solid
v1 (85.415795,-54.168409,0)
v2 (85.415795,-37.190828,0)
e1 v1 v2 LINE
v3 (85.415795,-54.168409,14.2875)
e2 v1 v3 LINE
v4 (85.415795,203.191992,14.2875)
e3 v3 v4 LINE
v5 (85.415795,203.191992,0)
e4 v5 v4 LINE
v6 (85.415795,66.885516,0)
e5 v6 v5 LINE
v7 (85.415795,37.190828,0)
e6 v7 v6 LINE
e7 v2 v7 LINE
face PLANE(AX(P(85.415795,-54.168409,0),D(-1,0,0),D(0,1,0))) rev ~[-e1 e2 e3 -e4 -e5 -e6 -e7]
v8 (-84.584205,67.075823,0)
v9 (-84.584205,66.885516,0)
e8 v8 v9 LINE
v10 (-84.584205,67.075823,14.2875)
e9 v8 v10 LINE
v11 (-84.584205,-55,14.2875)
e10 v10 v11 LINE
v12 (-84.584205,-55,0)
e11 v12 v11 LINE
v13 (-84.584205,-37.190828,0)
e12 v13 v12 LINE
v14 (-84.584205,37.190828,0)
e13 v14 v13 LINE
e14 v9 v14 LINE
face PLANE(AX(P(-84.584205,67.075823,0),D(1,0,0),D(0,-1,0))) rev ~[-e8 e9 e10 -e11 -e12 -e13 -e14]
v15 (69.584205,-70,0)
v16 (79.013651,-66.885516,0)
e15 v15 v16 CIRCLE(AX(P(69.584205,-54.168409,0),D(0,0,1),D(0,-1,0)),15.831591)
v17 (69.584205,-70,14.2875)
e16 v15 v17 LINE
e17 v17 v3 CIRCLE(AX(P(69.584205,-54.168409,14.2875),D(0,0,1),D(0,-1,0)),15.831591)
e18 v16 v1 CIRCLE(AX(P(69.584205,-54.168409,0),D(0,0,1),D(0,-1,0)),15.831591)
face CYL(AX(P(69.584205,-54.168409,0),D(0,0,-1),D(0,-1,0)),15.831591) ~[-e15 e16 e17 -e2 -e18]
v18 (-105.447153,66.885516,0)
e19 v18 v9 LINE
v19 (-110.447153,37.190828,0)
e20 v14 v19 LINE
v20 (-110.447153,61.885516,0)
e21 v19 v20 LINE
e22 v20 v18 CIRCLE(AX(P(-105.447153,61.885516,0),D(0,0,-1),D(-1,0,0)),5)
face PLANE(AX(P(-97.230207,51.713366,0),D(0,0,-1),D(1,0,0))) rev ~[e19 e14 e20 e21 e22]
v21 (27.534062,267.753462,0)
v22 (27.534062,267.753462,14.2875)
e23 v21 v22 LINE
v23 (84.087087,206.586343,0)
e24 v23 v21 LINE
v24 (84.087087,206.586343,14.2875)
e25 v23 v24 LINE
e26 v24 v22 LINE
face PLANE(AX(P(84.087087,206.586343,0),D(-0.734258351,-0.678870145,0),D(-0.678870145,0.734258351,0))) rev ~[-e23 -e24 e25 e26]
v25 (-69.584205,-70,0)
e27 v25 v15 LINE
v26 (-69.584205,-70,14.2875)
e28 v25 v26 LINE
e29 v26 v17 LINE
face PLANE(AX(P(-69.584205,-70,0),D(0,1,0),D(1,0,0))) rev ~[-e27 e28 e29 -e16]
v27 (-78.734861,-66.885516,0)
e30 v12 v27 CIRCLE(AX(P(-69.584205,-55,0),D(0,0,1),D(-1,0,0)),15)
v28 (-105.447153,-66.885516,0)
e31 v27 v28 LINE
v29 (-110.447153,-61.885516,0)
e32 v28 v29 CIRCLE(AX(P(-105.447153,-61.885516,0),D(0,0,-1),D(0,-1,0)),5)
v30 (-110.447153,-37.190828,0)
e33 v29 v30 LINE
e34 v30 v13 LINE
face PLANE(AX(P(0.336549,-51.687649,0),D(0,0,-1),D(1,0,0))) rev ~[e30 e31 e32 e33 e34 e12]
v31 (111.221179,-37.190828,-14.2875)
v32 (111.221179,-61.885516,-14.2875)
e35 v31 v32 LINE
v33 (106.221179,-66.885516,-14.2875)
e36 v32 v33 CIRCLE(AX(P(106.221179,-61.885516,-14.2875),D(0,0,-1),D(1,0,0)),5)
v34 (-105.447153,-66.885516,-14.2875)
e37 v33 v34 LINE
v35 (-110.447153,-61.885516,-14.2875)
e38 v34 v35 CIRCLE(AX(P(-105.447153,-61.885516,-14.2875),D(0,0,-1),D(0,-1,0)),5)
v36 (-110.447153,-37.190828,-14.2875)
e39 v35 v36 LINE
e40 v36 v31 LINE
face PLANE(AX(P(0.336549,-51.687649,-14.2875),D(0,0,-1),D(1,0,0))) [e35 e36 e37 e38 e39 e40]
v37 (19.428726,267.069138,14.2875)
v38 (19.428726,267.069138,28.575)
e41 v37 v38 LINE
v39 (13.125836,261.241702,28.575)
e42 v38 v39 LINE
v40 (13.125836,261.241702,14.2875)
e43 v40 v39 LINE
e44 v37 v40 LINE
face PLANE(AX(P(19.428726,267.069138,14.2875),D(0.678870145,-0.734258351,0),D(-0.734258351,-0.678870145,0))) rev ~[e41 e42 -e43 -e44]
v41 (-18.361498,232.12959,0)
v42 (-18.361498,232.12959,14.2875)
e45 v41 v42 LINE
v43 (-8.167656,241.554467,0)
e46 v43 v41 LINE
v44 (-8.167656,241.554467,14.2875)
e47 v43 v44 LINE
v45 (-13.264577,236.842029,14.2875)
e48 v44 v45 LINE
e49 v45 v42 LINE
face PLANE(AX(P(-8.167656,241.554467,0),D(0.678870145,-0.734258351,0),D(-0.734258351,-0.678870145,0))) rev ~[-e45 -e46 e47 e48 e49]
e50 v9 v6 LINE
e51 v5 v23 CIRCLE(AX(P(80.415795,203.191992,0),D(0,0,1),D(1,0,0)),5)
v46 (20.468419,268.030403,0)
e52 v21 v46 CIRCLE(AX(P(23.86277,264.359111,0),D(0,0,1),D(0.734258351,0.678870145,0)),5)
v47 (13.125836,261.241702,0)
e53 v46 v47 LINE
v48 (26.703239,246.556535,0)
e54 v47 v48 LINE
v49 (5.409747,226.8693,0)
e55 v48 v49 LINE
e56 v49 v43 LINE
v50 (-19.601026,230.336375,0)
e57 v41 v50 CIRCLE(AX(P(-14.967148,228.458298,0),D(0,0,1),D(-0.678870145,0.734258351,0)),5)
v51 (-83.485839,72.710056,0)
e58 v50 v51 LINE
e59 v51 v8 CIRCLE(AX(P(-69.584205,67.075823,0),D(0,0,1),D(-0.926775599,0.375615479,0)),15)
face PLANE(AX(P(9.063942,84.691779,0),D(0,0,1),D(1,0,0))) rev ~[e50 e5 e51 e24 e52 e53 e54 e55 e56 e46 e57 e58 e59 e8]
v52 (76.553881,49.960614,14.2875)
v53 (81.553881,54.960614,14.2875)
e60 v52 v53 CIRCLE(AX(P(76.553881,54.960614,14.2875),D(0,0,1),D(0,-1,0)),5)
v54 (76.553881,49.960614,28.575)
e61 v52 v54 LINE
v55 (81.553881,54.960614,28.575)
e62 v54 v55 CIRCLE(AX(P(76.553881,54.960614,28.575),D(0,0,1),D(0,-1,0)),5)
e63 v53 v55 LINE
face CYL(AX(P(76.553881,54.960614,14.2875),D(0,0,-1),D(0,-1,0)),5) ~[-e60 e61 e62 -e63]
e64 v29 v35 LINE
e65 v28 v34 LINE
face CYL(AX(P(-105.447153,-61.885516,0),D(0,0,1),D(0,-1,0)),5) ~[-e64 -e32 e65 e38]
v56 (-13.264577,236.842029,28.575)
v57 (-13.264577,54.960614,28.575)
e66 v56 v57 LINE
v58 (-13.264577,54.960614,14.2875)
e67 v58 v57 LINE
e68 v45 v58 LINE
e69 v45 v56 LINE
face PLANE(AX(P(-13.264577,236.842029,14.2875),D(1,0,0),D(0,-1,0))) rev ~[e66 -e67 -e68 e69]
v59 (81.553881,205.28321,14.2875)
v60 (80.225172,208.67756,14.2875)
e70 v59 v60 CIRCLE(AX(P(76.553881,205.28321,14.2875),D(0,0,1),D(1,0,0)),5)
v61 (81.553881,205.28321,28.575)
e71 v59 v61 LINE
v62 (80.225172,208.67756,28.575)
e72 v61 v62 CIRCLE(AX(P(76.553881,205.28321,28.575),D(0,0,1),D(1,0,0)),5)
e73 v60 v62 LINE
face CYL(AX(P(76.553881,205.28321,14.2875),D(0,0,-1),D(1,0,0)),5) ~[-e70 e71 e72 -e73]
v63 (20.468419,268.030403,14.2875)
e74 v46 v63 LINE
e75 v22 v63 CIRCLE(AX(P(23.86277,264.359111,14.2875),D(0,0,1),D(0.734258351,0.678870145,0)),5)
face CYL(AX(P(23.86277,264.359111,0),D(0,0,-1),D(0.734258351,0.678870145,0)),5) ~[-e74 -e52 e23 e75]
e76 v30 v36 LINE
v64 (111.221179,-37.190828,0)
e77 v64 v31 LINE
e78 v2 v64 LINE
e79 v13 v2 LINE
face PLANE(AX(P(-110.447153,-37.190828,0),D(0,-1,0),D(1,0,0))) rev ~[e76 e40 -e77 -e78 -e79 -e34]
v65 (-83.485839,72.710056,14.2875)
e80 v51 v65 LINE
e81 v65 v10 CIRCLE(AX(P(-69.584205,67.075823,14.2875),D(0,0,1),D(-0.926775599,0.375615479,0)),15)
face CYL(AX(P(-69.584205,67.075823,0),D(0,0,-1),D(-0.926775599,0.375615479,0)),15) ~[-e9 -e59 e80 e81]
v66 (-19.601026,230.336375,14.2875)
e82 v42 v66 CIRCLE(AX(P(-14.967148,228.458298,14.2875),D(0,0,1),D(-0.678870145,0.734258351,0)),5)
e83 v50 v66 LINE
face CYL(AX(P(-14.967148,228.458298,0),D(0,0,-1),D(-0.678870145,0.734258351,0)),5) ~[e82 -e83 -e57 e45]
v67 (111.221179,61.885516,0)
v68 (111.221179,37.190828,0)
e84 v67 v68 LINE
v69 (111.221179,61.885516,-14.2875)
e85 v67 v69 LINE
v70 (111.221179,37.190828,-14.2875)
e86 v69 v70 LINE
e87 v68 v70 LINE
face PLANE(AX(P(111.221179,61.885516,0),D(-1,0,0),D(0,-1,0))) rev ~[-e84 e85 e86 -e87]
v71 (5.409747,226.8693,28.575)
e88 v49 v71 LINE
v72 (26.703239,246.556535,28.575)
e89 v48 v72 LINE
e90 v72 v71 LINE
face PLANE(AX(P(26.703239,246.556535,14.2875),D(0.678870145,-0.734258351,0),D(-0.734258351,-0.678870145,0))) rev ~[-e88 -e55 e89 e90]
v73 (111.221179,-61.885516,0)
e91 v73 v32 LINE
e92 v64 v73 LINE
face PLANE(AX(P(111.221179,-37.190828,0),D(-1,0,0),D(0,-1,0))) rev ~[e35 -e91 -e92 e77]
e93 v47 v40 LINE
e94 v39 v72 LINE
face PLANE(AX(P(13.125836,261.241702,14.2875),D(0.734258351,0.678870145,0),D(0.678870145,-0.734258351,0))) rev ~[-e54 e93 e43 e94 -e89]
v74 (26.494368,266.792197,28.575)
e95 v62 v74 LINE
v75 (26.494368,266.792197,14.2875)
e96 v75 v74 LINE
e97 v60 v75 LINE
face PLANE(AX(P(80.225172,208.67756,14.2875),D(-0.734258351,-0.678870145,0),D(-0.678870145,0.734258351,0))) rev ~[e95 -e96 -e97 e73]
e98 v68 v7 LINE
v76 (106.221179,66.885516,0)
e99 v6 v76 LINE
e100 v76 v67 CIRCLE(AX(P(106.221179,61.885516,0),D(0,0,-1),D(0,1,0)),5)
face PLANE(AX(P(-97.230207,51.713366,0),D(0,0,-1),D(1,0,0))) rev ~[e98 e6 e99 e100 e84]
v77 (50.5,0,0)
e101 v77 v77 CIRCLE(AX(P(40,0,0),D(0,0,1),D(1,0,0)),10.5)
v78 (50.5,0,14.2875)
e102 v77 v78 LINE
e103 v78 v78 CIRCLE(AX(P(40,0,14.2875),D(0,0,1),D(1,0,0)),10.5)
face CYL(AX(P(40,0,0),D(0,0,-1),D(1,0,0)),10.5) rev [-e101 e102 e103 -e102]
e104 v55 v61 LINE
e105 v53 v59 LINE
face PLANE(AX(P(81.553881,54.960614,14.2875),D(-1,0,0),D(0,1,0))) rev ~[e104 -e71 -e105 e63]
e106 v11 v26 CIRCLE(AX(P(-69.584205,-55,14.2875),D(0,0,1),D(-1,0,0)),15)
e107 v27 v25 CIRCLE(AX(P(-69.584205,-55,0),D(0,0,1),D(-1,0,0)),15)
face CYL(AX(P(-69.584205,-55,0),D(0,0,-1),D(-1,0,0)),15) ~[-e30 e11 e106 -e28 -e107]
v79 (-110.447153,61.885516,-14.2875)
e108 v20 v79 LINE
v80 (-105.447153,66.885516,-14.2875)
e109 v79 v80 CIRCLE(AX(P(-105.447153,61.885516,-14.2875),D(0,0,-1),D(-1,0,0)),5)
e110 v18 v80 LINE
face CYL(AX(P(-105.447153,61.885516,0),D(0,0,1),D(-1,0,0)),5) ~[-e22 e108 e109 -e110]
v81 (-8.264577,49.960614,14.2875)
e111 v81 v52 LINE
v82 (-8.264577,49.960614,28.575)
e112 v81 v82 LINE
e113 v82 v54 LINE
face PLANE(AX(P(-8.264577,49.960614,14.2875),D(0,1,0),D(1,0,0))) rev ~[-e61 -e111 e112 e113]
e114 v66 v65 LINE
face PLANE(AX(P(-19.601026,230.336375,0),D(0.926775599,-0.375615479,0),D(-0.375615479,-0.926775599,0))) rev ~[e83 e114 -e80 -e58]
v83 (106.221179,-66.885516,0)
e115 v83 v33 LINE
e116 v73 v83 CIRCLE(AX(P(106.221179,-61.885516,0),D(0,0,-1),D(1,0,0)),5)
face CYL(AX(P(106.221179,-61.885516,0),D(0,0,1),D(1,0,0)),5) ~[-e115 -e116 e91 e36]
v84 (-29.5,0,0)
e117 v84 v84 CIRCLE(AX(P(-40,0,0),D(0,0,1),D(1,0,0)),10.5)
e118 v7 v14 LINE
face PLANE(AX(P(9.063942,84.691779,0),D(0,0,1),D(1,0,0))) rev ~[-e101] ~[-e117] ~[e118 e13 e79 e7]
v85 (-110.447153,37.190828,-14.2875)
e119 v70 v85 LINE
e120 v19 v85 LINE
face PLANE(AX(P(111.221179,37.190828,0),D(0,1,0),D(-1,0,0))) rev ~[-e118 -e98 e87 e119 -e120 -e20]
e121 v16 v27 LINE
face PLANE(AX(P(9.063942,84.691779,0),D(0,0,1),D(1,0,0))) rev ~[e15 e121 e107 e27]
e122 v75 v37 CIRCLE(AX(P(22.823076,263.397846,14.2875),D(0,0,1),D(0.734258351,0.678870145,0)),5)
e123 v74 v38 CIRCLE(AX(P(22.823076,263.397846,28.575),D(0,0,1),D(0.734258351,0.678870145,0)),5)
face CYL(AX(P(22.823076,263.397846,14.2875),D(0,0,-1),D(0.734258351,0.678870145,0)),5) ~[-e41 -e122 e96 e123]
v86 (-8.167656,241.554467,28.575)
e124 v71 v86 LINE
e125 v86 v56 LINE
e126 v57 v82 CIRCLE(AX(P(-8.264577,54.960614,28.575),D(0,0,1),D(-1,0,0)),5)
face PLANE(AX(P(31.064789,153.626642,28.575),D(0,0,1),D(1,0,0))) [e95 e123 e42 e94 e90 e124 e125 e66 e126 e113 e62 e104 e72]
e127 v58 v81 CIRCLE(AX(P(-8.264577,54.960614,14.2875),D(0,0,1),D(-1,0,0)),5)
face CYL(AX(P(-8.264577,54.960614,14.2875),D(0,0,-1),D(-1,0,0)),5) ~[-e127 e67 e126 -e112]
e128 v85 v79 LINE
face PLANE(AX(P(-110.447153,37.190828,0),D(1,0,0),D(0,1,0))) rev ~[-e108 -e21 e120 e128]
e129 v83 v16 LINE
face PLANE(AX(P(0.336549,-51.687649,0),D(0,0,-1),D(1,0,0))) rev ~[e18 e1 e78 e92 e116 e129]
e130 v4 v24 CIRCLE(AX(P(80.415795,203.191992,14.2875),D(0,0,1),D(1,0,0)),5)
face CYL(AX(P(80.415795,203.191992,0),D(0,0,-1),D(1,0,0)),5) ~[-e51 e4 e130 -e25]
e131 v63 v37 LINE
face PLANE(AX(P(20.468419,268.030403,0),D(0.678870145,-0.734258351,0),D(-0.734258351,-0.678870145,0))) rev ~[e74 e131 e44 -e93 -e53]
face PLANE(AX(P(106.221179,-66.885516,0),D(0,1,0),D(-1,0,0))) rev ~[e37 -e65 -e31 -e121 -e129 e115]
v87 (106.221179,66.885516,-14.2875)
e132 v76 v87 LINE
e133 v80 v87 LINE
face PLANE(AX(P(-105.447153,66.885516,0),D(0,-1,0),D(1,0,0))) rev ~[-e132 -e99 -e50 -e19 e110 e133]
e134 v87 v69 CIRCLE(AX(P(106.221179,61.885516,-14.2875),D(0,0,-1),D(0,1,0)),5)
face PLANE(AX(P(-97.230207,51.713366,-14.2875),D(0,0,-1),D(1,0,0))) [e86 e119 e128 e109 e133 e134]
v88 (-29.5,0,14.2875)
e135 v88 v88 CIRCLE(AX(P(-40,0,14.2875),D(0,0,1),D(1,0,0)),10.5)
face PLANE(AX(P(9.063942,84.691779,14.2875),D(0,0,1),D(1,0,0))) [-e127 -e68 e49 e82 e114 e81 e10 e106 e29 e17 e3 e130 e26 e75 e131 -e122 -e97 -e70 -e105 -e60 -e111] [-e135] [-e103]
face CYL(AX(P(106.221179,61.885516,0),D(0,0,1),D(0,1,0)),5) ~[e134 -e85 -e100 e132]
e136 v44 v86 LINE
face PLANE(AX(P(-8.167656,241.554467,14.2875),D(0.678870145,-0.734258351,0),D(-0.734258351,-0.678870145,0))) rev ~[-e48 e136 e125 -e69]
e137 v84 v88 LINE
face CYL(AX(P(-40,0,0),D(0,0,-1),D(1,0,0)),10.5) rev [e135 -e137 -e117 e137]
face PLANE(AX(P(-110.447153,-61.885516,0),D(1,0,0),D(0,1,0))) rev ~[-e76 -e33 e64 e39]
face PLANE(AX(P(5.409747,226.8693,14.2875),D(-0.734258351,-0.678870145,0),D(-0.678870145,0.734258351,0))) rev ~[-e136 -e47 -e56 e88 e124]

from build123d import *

# Parameters (mm, degrees)
F0_R     = 10.5
F1_DEPTH = 14.2875
F2_W     = 170
F2_H     = 29.6946875751
F3_DEPTH = 14.2875
F5_DEPTH = 14.2875


# Not quite as in the source:
# - a length typed as a fraction of an inch, garbled in the dataset ("3 / 203.2 mm" for 3/8 in), is restored
# - a feature names something its author has since deleted; it is built from what else it names


with BuildPart() as f1:
    # F0 (on Top) → F1 (new body)
    with BuildSketch(Plane.XY):
        with BuildLine():
            ThreePointArc((-84.5842045546, -55), (-80.1908062724, -65.6066017178), (-69.5842045546, -70))
            Line((-69.5842045546, -70), (69.5842045546, -70))
            ThreePointArc((69.5842045546, -70), (80.7788298305, -65.363034385), (85.4157954454, -54.1684091091))
            Line((85.4157954454, -54.1684091091), (85.4157954454, 203.1919921827))
            ThreePointArc((85.4157954454, 203.1919921827), (85.0717839963, 205.0145647093), (84.0870871996, 206.5863429094))
            Line((84.0870871996, 206.5863429094), (27.5340619023, 267.7534620916))
            ThreePointArc((27.5340619023, 267.7534620916), (24.0585970267, 269.3552750765), (20.4684194215, 268.030403119))
            Line((20.4684194215, 268.030403119), (13.1258359132, 261.2417016656))
            Line((13.1258359132, 261.2417016656), (26.70323882, 246.556534649))
            Line((26.70323882, 246.556534649), (16.0564927329, 236.7129175415))
            Line((16.0564927329, 236.7129175415), (5.4097466459, 226.8693004341))
            Line((5.4097466459, 226.8693004341), (-8.1676562609, 241.5544674507))
            Line((-8.1676562609, 241.5544674507), (-18.3614984488, 232.1295897903))
            ThreePointArc((-18.3614984488, 232.1295897903), (-19.0801780579, 231.3013565049), (-19.6010257192, 230.336375433))
            Line((-19.6010257192, 230.336375433), (-83.4858385457, 72.7100555545))
            ThreePointArc((-83.4858385457, 72.7100555545), (-84.3070526124, 69.9459705844), (-84.5842045546, 67.0758233641))
            Line((-84.5842045546, 67.0758233641), (-84.5842045546, -55))
        make_face()
        with Locations((-40, 0)):
            Circle(F0_R, mode=Mode.SUBTRACT)
        with Locations((40, 0)):
            Circle(F0_R, mode=Mode.SUBTRACT)
    extrude(amount=F1_DEPTH)

    # F2 (on face) → F3 (join)
    with BuildSketch(Plane(origin=(0, 0, 0), x_dir=(1, 0, 0), z_dir=(0, 0, -1))):
        with BuildLine():
            ThreePointArc((-110.4471534491, -61.8855160475), (-108.982687355, -65.4210499534), (-105.4471534491, -66.8855160475))
            Line((-105.4471534491, -66.8855160475), (-84.5842045546, -66.8855160475))
            Line((-84.5842045546, -66.8855160475), (-84.5842045546, -37.1908284724))
            Line((-84.5842045546, -37.1908284724), (-110.4471534491, -37.1908284724))
            Line((-110.4471534491, -37.1908284724), (-110.4471534491, -61.8855160475))
        make_face()
        with Locations((0.4157954454, -52.0381722599)):
            Rectangle(F2_W, F2_H)
        with BuildLine():
            Line((85.4157954454, -37.1908284724), (85.4157954454, -66.8855160475))
            Line((85.4157954454, -66.8855160475), (106.2211793661, -66.8855160475))
            ThreePointArc((106.2211793661, -66.8855160475), (109.756713272, -65.4210499534), (111.2211793661, -61.8855160475))
            Line((111.2211793661, -61.8855160475), (111.2211793661, -37.1908284724))
            Line((111.2211793661, -37.1908284724), (85.4157954454, -37.1908284724))
        make_face()
        with BuildLine():
            Line((-84.5842045546, 55), (-84.5842045546, 37.1908284724))
            Line((-84.5842045546, 37.1908284724), (85.4157954454, 37.1908284724))
            Line((85.4157954454, 37.1908284724), (85.4157954454, 54.1684091091))
            ThreePointArc((85.4157954454, 54.1684091091), (83.7249684911, 61.287261926), (79.0136510523, 66.8855160475))
            Line((79.0136510523, 66.8855160475), (-78.7348607215, 66.8855160475))
            ThreePointArc((-78.7348607215, 66.8855160475), (-83.0426562208, 61.623449158), (-84.5842045546, 55))
        make_face()
        with BuildLine():
            Line((-110.4471534491, 37.1908284724), (-84.5842045546, 37.1908284724))
            Line((-84.5842045546, 37.1908284724), (-84.5842045546, 55))
            ThreePointArc((-84.5842045546, 55), (-83.0426562208, 61.623449158), (-78.7348607215, 66.8855160475))
            Line((-78.7348607215, 66.8855160475), (-105.4471534491, 66.8855160475))
            ThreePointArc((-105.4471534491, 66.8855160475), (-108.982687355, 65.4210499534), (-110.4471534491, 61.8855160475))
            Line((-110.4471534491, 61.8855160475), (-110.4471534491, 37.1908284724))
        make_face()
        with BuildLine():
            Line((85.4157954454, 54.1684091091), (85.4157954454, 37.1908284724))
            Line((85.4157954454, 37.1908284724), (111.2211793661, 37.1908284724))
            Line((111.2211793661, 37.1908284724), (111.2211793661, 61.8855160475))
            ThreePointArc((111.2211793661, 61.8855160475), (109.756713272, 65.4210499534), (106.2211793661, 66.8855160475))
            Line((106.2211793661, 66.8855160475), (79.0136510523, 66.8855160475))
            ThreePointArc((79.0136510523, 66.8855160475), (83.7249684911, 61.287261926), (85.4157954454, 54.1684091091))
        make_face()
    extrude(amount=F3_DEPTH)

    # F4 (on face) → F5 (join)
    with BuildSketch(Plane.XY.offset(14.2875)):
        with BuildLine():
            Line((-8.2645773549, 49.9606142757), (76.5538805598, 49.9606142757))
            ThreePointArc((76.5538805598, 49.9606142757), (80.0894144658, 51.4250803698), (81.5538805598, 54.9606142757))
            Line((81.5538805598, 54.9606142757), (81.5538805598, 205.2832095857))
            ThreePointArc((81.5538805598, 205.2832095857), (81.2098691107, 207.1057821123), (80.225172314, 208.6775603124))
            Line((80.225172314, 208.6775603124), (26.4943680898, 266.7921967701))
            ThreePointArc((26.4943680898, 266.7921967701), (23.0189032141, 268.3940097551), (19.4287256089, 267.0691377976))
            Line((19.4287256089, 267.0691377976), (13.1258359132, 261.2417016656))
            Line((13.1258359132, 261.2417016656), (26.70323882, 246.556534649))
            Line((26.70323882, 246.556534649), (5.4097466459, 226.8693004341))
            Line((5.4097466459, 226.8693004341), (-8.1676562609, 241.5544674507))
            Line((-8.1676562609, 241.5544674507), (-13.2645773549, 236.8420286205))
            Line((-13.2645773549, 236.8420286205), (-13.2645773549, 54.9606142757))
            ThreePointArc((-13.2645773549, 54.9606142757), (-11.8001112608, 51.4250803698), (-8.2645773549, 49.9606142757))
        make_face()
    extrude(amount=F5_DEPTH)


solid = f1.part
